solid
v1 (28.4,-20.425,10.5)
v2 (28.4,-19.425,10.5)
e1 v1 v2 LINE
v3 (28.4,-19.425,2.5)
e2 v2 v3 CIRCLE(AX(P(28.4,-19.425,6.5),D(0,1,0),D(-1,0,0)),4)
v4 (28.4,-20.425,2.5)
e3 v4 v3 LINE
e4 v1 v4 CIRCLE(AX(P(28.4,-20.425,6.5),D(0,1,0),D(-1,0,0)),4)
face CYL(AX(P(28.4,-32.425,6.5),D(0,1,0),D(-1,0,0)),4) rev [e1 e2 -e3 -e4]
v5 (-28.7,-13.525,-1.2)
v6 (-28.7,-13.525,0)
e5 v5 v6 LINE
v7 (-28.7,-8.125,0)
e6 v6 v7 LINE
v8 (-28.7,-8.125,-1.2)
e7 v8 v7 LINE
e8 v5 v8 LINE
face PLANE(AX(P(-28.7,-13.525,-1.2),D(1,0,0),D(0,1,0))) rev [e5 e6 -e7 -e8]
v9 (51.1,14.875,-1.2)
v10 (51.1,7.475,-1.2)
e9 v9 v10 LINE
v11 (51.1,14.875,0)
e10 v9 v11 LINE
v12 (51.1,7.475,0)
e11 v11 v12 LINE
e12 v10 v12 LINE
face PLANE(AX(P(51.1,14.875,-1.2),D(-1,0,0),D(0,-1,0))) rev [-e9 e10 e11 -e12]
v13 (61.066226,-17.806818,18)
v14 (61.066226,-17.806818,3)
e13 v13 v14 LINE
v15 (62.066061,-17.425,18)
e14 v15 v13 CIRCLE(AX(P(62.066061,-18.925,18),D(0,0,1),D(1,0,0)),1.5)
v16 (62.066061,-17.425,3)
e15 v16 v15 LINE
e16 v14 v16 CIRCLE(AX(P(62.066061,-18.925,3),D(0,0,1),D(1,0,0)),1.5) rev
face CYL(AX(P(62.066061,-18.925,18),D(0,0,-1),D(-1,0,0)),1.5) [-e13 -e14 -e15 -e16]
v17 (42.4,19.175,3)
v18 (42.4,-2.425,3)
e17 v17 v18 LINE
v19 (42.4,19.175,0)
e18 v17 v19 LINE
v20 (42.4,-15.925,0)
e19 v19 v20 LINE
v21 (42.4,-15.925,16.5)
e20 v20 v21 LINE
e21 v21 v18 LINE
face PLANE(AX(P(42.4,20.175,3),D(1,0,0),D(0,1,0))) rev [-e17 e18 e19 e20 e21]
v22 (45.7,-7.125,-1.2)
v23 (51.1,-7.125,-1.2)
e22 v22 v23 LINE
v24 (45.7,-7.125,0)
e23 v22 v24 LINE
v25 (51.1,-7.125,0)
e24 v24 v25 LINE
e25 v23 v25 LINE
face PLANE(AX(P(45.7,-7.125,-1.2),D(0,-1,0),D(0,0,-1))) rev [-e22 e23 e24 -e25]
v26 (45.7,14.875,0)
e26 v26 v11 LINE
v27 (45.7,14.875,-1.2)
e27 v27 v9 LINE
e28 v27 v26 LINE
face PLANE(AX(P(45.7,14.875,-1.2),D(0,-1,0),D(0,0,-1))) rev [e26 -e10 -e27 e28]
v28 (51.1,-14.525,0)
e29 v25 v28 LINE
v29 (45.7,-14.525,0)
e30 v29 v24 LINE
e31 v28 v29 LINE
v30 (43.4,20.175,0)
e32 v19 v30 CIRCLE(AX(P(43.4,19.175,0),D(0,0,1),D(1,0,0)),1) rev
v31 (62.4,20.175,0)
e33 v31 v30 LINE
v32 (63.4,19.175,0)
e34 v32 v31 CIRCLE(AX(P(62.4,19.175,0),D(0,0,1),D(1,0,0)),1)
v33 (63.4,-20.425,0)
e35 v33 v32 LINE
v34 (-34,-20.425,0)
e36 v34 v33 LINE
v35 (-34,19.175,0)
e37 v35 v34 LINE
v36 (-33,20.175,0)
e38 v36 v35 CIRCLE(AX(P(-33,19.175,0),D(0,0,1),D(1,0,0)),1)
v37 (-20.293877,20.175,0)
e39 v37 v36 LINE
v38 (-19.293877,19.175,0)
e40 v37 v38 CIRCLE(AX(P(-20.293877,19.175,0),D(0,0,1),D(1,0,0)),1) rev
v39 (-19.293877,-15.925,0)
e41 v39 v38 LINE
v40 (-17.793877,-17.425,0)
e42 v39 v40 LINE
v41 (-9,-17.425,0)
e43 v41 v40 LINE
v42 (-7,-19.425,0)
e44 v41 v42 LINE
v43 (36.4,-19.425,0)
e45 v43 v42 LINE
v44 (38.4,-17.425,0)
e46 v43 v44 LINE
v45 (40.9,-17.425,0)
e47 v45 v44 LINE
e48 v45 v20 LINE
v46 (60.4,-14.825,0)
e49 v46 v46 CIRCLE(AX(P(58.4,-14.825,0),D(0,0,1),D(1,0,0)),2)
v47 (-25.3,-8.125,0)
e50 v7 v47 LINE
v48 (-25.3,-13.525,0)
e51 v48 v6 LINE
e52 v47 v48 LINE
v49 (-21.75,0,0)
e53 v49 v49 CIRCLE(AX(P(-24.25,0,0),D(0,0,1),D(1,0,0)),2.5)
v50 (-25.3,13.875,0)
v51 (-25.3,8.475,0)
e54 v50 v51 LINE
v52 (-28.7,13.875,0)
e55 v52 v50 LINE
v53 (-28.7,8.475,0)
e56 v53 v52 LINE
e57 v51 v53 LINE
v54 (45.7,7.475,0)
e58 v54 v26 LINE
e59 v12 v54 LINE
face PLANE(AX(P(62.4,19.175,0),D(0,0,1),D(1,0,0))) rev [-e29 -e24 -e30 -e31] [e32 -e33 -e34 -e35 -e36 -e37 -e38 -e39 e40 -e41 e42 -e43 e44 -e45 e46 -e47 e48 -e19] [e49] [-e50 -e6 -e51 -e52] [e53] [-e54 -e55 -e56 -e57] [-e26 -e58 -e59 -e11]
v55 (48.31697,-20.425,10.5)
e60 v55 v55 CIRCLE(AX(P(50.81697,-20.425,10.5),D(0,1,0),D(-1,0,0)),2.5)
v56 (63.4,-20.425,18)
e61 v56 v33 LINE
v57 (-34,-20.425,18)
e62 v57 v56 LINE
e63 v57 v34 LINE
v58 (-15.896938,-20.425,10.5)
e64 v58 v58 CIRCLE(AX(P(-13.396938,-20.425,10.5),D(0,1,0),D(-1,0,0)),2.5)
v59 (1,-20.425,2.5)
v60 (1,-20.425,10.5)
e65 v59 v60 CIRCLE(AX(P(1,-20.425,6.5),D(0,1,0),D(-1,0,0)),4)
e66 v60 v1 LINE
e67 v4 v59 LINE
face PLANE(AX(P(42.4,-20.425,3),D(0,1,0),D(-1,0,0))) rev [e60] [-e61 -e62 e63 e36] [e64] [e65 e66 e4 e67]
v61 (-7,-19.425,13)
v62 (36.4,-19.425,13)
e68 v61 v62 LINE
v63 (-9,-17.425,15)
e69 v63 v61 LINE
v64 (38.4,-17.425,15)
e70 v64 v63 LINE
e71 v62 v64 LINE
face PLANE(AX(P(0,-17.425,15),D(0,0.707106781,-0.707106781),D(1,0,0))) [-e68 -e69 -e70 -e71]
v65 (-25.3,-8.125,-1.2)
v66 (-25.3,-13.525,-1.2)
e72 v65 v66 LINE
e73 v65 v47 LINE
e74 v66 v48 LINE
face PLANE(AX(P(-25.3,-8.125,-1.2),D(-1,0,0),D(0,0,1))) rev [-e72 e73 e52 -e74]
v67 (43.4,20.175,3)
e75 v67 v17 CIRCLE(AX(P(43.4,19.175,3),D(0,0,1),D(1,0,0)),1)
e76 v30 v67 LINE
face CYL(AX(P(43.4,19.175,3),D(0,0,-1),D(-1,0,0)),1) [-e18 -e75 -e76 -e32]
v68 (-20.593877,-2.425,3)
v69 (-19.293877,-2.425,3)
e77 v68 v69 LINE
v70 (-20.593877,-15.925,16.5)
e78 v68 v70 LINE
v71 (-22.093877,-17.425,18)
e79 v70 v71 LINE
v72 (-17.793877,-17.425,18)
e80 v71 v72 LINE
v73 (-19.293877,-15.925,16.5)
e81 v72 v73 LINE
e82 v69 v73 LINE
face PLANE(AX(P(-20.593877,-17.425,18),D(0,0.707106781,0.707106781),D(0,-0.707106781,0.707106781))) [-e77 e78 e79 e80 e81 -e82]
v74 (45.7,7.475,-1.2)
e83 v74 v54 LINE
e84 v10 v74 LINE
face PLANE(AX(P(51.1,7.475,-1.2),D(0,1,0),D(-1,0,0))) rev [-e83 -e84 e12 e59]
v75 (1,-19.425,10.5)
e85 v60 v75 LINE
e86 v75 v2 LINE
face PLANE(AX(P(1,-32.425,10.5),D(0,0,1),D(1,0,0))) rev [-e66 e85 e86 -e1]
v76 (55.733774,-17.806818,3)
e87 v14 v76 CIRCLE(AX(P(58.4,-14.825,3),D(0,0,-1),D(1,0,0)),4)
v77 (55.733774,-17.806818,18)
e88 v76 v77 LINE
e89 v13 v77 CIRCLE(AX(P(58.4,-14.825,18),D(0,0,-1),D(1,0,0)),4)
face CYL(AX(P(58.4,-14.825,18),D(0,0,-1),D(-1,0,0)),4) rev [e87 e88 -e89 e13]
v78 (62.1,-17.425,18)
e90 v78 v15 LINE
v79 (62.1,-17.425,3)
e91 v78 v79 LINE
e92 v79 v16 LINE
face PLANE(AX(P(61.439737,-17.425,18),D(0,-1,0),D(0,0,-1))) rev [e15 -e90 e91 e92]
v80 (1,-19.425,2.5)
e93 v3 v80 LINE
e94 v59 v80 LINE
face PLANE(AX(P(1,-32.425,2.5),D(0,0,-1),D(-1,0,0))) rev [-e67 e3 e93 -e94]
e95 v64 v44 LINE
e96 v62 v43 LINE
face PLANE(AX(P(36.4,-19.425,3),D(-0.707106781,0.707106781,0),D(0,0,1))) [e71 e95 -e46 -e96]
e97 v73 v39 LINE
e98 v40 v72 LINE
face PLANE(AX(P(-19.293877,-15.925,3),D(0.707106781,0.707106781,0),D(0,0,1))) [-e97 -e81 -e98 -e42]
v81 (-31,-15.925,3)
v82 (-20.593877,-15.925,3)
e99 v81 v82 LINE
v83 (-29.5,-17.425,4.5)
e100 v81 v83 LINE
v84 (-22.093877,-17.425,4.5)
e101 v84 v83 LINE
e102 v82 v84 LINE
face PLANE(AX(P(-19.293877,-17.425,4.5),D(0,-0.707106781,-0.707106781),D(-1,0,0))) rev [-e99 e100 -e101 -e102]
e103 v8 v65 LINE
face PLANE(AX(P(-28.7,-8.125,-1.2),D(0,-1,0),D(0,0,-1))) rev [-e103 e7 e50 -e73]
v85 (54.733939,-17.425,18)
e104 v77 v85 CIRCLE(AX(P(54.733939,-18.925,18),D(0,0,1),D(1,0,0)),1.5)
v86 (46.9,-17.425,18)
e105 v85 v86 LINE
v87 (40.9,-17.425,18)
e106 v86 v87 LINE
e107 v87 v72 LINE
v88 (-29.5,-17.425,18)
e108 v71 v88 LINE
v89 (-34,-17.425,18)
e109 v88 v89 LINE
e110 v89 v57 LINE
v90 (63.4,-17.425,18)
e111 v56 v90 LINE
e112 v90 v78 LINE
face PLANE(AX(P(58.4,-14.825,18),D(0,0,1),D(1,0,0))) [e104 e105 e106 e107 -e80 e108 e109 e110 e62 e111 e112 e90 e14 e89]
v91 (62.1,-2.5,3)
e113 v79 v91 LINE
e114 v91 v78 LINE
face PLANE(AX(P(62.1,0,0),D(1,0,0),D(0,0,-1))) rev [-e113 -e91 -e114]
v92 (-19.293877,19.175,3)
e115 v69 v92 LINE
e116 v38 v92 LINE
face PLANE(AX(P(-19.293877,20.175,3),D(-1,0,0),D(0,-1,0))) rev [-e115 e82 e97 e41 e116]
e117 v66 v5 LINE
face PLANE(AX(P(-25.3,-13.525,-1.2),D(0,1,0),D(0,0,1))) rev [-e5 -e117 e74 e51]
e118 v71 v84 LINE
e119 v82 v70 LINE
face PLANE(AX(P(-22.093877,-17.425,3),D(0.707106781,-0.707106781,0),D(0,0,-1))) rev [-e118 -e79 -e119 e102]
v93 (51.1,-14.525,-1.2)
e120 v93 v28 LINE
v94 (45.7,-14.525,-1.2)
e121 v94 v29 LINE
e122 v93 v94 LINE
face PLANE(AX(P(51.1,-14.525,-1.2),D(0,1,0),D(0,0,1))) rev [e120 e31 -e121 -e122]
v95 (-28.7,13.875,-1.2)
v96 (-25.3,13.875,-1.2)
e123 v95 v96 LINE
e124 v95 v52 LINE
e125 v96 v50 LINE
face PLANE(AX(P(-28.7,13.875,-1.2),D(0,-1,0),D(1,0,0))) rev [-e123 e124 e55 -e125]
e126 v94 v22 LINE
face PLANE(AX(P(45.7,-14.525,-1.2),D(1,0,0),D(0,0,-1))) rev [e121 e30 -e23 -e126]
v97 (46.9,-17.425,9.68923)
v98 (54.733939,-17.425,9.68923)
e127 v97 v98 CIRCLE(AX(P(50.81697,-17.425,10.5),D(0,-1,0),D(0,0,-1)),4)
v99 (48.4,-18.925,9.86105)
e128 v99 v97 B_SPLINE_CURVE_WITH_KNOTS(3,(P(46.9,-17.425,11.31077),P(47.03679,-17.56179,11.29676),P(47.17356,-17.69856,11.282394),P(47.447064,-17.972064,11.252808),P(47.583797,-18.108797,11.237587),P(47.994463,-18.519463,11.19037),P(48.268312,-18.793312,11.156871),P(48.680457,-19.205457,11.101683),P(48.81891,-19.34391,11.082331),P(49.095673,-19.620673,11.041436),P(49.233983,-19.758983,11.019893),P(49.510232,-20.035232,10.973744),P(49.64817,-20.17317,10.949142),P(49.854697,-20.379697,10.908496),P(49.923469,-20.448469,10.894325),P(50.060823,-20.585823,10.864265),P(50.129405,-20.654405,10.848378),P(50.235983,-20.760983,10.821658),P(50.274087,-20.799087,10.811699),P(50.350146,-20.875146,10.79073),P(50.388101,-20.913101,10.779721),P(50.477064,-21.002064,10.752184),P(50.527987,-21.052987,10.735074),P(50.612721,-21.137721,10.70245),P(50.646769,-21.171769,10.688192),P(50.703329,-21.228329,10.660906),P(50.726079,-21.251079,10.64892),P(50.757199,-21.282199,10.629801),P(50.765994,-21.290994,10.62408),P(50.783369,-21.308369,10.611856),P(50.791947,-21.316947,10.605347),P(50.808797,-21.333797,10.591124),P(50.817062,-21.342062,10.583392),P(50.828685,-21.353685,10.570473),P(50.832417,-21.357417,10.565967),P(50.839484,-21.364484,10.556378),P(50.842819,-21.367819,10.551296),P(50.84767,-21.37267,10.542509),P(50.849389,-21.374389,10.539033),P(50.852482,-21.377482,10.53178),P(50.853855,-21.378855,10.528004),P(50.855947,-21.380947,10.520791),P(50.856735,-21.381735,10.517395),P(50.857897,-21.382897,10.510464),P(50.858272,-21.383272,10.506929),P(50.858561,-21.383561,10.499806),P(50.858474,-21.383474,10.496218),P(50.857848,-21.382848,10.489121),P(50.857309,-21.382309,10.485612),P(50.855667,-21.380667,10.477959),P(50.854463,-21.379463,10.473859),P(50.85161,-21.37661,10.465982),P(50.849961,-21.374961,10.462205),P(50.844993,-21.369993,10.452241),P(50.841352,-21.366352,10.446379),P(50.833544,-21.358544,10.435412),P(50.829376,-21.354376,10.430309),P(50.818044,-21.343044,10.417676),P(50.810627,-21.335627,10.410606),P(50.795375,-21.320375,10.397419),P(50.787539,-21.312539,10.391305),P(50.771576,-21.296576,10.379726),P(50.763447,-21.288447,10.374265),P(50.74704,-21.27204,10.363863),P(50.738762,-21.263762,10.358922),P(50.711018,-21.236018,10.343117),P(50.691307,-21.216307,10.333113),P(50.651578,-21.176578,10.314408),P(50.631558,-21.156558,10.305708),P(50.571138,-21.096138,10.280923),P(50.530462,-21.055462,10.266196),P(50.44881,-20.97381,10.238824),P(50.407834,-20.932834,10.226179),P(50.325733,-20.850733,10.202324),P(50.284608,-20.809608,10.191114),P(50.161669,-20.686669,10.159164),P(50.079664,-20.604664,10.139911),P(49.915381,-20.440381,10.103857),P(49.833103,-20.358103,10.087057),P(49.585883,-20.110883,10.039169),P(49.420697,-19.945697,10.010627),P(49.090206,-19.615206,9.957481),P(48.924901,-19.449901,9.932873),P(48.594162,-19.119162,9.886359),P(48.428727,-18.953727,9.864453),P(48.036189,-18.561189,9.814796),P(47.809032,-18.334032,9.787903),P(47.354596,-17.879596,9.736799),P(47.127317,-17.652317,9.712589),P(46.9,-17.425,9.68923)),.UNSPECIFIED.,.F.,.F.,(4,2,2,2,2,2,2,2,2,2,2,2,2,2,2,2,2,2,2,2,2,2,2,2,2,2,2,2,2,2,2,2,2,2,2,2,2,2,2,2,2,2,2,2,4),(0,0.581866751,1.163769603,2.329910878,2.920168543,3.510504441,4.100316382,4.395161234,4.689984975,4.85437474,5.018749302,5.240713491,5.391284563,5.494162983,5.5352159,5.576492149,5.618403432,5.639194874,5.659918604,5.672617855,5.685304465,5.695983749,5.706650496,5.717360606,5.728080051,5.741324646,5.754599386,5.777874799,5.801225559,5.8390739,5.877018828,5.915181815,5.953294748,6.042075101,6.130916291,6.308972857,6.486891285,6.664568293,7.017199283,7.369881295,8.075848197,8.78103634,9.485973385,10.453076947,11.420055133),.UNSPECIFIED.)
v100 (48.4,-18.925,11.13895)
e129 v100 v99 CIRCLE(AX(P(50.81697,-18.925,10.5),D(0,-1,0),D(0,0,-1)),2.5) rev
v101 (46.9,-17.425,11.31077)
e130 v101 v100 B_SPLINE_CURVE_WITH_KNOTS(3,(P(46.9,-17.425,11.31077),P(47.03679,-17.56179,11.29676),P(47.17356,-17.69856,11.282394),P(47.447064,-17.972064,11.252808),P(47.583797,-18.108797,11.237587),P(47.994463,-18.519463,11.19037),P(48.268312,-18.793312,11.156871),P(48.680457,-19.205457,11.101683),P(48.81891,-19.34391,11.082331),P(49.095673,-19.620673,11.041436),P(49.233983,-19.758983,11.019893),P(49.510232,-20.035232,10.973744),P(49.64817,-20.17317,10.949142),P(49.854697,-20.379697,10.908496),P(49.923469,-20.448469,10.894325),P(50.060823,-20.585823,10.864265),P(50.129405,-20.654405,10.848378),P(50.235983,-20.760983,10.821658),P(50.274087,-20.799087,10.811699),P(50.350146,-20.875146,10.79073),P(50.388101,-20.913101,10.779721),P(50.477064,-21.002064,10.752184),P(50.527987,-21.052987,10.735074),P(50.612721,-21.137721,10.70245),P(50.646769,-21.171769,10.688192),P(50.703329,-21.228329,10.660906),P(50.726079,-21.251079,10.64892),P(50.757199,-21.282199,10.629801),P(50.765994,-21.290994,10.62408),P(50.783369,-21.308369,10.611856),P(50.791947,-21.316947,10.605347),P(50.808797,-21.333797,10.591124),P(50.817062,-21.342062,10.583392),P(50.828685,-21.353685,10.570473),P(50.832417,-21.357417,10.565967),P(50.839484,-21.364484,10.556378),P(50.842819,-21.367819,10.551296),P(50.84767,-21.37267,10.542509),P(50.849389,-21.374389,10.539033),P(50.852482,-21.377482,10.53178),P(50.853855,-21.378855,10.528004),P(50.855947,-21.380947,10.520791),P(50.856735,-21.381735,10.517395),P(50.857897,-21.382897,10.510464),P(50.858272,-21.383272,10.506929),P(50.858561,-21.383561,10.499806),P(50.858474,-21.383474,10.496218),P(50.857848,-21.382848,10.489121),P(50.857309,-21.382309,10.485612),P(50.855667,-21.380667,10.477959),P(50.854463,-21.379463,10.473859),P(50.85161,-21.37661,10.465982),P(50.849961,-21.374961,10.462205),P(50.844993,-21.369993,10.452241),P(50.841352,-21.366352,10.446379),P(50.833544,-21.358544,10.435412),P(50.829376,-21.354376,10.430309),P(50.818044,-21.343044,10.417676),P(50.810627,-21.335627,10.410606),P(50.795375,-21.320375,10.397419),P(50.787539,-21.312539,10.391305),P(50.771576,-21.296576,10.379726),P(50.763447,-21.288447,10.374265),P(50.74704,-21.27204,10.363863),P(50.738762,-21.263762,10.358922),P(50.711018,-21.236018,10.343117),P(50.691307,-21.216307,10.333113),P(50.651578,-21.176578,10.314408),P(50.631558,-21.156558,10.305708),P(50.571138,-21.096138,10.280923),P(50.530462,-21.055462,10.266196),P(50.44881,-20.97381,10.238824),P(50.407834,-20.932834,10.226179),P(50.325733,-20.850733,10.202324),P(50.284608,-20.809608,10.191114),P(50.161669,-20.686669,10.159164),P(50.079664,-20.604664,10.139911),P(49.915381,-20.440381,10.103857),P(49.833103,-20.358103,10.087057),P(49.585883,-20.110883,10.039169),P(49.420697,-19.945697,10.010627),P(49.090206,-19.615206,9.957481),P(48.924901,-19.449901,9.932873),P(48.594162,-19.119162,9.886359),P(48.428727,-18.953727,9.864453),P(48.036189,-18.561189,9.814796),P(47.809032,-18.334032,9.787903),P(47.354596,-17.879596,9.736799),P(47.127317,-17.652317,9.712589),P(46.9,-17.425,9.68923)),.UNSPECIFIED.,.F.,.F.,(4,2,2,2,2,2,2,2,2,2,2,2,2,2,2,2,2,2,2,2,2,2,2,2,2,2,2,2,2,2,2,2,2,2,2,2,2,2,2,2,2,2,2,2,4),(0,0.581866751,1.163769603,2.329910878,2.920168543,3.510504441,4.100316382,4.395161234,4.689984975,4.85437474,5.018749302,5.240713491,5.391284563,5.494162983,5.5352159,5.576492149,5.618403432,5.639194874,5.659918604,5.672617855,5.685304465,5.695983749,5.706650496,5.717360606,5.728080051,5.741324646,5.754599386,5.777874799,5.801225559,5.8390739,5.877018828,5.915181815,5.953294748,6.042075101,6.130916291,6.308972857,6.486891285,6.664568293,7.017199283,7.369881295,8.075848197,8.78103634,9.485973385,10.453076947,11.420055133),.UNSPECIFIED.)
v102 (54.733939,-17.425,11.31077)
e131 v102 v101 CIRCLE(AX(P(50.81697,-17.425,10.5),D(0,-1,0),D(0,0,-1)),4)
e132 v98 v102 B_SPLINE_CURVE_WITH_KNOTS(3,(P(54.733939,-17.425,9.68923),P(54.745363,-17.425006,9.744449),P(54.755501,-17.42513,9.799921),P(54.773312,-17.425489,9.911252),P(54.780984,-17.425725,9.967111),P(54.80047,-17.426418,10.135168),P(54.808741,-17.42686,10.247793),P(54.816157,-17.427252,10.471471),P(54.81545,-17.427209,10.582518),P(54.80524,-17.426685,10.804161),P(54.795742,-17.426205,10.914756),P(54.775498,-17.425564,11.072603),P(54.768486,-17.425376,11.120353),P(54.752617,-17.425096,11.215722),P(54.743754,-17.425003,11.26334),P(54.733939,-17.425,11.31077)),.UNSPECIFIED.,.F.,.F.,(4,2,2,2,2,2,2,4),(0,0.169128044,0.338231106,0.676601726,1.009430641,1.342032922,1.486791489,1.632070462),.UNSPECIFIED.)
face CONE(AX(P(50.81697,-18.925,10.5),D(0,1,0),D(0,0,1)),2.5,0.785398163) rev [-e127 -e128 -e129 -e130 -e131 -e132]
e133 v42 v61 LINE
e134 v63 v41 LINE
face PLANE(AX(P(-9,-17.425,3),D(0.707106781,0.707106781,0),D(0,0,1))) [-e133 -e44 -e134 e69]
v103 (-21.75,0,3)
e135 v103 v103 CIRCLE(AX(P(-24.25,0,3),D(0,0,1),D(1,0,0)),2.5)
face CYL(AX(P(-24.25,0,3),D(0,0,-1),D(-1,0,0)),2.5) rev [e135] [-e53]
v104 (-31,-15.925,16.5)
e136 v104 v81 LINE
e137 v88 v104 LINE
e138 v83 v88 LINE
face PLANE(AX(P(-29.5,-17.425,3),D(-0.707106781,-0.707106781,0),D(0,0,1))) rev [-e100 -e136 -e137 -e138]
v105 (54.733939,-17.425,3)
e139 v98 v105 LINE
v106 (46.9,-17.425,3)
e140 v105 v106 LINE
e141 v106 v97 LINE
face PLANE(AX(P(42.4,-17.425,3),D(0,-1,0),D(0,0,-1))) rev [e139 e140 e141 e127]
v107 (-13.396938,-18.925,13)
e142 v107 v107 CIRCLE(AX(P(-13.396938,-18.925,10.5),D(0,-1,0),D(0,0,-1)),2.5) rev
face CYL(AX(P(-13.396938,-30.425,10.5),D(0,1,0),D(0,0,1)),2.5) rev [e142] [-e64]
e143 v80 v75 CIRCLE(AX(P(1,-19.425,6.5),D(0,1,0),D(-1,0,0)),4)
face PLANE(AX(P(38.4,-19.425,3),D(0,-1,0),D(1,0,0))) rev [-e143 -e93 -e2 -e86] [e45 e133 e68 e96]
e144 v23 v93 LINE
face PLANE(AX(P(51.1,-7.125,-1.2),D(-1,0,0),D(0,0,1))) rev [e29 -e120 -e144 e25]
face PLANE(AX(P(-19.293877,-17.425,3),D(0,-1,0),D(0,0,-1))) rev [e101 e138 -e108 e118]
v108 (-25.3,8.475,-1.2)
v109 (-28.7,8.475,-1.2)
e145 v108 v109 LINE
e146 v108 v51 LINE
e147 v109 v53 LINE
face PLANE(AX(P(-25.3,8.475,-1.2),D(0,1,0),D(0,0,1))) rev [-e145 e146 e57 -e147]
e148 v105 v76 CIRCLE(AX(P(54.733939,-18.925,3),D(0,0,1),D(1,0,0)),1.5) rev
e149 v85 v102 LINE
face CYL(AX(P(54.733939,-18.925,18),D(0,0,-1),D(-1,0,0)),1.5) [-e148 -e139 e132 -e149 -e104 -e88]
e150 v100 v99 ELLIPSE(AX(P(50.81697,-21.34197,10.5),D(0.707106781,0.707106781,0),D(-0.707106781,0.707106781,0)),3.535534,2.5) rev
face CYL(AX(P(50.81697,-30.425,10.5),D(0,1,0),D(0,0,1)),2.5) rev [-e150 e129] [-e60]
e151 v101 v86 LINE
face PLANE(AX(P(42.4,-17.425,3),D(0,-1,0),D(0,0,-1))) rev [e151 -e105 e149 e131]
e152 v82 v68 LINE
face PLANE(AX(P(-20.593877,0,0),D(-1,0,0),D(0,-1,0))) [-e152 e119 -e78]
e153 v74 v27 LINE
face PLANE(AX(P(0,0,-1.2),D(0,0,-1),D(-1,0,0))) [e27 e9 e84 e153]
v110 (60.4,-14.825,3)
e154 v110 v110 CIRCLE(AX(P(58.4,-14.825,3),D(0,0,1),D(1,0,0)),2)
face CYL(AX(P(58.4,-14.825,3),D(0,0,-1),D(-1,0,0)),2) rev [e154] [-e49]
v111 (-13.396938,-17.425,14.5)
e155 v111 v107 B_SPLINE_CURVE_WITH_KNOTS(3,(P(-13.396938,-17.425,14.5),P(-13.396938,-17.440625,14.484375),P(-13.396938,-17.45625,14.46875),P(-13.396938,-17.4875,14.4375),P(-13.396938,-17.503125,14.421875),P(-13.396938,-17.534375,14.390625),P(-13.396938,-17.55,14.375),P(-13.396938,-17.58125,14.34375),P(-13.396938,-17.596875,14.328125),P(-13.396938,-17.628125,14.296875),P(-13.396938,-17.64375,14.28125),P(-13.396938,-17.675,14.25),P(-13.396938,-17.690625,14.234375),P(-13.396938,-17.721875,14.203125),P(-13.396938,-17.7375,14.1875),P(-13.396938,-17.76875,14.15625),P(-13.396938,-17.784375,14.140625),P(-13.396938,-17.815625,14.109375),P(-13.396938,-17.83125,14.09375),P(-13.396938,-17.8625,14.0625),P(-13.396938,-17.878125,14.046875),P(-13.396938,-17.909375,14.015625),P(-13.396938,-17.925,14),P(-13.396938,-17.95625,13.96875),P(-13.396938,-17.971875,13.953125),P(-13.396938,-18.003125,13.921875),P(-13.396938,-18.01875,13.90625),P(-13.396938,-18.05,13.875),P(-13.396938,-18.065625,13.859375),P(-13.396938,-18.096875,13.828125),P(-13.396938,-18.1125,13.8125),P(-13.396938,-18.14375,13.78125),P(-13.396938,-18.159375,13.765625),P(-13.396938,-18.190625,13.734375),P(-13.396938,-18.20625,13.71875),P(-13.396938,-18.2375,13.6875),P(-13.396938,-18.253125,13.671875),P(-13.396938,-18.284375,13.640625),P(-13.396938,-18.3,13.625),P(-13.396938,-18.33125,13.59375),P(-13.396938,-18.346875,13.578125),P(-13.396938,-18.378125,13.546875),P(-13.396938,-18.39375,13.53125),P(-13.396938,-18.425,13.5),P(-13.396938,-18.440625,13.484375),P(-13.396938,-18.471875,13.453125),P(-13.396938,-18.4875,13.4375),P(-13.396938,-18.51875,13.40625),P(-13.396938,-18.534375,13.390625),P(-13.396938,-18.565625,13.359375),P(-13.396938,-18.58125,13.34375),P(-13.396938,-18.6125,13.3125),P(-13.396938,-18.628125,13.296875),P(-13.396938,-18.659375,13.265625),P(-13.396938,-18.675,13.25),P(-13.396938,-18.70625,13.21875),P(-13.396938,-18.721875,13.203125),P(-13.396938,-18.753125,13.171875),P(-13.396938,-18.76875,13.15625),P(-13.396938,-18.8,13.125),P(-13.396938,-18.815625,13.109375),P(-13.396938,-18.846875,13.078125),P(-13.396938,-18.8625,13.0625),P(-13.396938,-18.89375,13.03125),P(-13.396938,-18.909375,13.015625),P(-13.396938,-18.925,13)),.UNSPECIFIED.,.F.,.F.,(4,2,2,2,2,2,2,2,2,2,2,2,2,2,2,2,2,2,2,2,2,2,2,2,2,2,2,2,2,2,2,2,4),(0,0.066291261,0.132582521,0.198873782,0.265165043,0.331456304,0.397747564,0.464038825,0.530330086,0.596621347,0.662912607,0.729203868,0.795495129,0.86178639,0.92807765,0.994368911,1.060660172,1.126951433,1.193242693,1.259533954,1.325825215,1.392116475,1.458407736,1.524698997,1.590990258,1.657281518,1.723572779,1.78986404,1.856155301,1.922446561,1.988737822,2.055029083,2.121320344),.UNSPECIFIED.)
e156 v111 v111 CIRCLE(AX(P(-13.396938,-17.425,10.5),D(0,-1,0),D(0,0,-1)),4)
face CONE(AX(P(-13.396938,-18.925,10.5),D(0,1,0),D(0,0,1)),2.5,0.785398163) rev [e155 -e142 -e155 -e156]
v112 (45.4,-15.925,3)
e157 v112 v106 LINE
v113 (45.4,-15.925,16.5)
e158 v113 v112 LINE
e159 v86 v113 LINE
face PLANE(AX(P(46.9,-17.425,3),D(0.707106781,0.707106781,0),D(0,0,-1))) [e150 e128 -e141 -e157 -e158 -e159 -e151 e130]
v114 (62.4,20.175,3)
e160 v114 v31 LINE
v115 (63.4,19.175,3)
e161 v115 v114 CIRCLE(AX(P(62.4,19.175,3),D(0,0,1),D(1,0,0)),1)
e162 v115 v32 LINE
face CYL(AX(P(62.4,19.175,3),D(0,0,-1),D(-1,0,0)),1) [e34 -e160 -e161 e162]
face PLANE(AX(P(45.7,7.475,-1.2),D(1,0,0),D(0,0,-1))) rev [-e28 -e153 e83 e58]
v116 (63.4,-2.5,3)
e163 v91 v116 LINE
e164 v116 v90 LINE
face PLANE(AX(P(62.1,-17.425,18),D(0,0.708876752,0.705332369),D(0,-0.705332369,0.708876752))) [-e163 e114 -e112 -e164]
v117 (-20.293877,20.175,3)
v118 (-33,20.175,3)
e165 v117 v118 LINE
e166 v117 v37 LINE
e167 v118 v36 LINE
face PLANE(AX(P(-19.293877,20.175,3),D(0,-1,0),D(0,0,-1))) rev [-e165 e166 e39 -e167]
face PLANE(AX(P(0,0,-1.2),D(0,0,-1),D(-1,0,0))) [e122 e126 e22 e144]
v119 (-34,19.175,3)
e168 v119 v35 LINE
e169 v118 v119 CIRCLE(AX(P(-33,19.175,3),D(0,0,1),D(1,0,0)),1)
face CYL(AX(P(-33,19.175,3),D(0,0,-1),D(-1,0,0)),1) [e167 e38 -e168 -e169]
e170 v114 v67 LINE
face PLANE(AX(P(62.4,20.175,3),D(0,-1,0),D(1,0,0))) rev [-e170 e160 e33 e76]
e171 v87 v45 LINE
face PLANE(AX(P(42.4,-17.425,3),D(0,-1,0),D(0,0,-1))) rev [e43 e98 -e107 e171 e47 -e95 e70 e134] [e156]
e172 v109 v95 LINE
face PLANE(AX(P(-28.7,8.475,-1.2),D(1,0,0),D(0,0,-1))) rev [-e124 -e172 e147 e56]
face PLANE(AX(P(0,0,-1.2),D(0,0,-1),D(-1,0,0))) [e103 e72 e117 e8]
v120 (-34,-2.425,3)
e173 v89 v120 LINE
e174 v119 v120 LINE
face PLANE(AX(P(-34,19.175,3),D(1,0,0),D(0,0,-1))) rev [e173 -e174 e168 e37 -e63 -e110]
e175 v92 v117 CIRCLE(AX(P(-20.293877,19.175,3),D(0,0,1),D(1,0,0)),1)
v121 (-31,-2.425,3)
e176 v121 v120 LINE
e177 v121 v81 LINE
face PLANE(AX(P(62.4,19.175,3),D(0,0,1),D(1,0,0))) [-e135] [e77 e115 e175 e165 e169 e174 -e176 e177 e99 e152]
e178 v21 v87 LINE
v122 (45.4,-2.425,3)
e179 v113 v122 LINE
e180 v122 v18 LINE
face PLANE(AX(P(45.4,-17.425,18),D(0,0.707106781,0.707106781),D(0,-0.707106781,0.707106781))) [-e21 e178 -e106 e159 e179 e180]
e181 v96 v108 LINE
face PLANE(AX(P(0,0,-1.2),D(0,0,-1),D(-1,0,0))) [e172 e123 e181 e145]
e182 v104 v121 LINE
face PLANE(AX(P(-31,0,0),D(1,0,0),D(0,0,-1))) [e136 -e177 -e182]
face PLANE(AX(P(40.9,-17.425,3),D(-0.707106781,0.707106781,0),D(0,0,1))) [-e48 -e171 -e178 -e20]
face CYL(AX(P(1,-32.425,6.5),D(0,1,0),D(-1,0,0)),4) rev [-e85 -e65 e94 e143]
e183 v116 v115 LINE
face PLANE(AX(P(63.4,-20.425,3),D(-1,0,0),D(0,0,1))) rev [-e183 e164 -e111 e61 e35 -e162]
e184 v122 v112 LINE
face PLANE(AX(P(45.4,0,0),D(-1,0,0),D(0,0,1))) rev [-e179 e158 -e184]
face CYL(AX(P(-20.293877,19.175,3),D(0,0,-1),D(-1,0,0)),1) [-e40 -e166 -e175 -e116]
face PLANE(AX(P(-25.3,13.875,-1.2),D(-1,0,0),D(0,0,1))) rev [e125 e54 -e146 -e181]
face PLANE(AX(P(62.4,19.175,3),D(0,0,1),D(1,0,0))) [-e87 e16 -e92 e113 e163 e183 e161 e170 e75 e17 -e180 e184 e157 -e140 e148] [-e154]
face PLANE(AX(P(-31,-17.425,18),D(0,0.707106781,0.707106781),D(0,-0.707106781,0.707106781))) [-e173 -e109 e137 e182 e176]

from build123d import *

# Parameters (mm, degrees)
ESBO_O2_R                = 2.5
ESBO_O2_R_2              = 2
RESSALTO_EXTRUS_O1_DEPTH = 3
ESBO_O3_W                = 5.4
ESBO_O3_H                = 7.4
ESBO_O3_W_2              = 3.4
ESBO_O3_H_2              = 5.4
RESSALTO_EXTRUS_O2_DEPTH = 1.2
RESSALTO_EXTRUS_O3_DEPTH = 15
CHANFRO1_SIZE            = 2
FILETE1_R                = 1.5
FILETE2_R                = 1
RESSALTO_EXTRUS_O4_DEPTH = 3
RESSALTO_EXTRUS_O5_DEPTH = 1.3
RESSALTO_EXTRUS_O6_DEPTH = 1.3
RESSALTO_EXTRUS_O7_DEPTH = 3
CHANFRO2_SIZE            = 1.5
ESBO_O10_R               = 2.5
CORTE_EXTRUS_O1_DEPTH    = 13
CHANFRO3_SIZE            = 1.5
CORTE_EXTRUS_O2_DEPTH    = 13
ESBO_O12_W               = 47.4
ESBO_O12_H               = 3
RESSALTO_EXTRUS_O8_DEPTH = 3
CHANFRO4_SIZE            = 2


# Some blends are built 0.0001 mm under size
with BuildPart() as part:
    # Esboço2 → Ressalto-extrusão1 (new body)
    with BuildSketch(Plane.XY):
        with BuildLine():
            Line((-19.293876913, 20.175), (-19.293876913, -17.425))
            Line((-19.293876913, -17.425), (-9, -17.425))
            Line((-9, -17.425), (-9, -19.425))
            Line((-9, -19.425), (38.4, -19.425))
            Line((38.4, -19.425), (38.4, -17.425))
            Line((38.4, -17.425), (42.4, -17.425))
            Line((42.4, -17.425), (42.4, 20.175))
            Line((42.4, 20.175), (62.4, 20.175))
            ThreePointArc((62.4, 20.175), (63.107106781, 19.882106781), (63.4, 19.175))
            Line((63.4, 19.175), (63.4, -20.425))
            Line((63.4, -20.425), (42.4, -20.425))
            Line((42.4, -20.425), (-19.293876913, -20.425))
            Line((-19.293876913, -20.425), (-34, -20.425))
            Line((-34, -20.425), (-34, 19.175))
            ThreePointArc((-34, 19.175), (-33.707106781, 19.882106781), (-33, 20.175))
            Line((-33, 20.175), (-19.293876913, 20.175))
        make_face()
        with Locations((-24.25, 0)):
            Circle(ESBO_O2_R, mode=Mode.SUBTRACT)
        with Locations((58.4, -14.825)):
            Circle(ESBO_O2_R_2, mode=Mode.SUBTRACT)
    extrude(amount=RESSALTO_EXTRUS_O1_DEPTH)

    # Esboço3 → Ressalto-extrusão2 (add)
    with BuildSketch(Plane(origin=(0, 0, 0), x_dir=(-1, 0, 0), z_dir=(0, 0, -1))):
        with Locations((-48.4, 11.175)):
            Rectangle(ESBO_O3_W, ESBO_O3_H)
        with Locations((-48.4, -10.825)):
            Rectangle(ESBO_O3_W, ESBO_O3_H)
        with Locations((27, 11.175)):
            Rectangle(ESBO_O3_W_2, ESBO_O3_H_2)
        with Locations((27, -10.825)):
            Rectangle(ESBO_O3_W_2, ESBO_O3_H_2)
    extrude(amount=RESSALTO_EXTRUS_O2_DEPTH)

    # Esboço4 → Ressalto-extrusão3 (add)
    with BuildSketch(Plane.XY.offset(3)):
        with BuildLine():
            Line((-34, -20.425), (63.4, -20.425))
            Line((63.4, -20.425), (63.4, -17.425))
            Line((63.4, -17.425), (61.439736831, -17.425))
            ThreePointArc((61.439736831, -17.425), (58.4, -18.825), (55.360263169, -17.425))
            Line((55.360263169, -17.425), (38.4, -17.425))
            Line((38.4, -17.425), (38.4, -19.425))
            Line((38.4, -19.425), (-9, -19.425))
            Line((-9, -19.425), (-9, -17.425))
            Line((-9, -17.425), (-34, -17.425))
            Line((-34, -17.425), (-34, -20.425))
        make_face()
    extrude(amount=RESSALTO_EXTRUS_O3_DEPTH)

    # Chanfro1
    chanfro1_edges = [part.edges().sort_by_distance(p)[0] for p in [
        (38.4, -19.425, 9),
        (-9, -19.425, 9),
    ]]
    chamfer(chanfro1_edges, length=CHANFRO1_SIZE - 0.0001)  # a hair under: the kernel refuses the full size

    # Filete1
    filete1_edges = [part.edges().sort_by_distance(p)[0] for p in [
        (61.439736831, -17.425, 10.5),
        (55.360263169, -17.425, 10.5),
    ]]
    fillet(filete1_edges, radius=FILETE1_R)

    # Filete2
    filete2_edges = [part.edges().sort_by_distance(p)[0] for p in [
        (-19.293876913, 20.175, 1.5),
        (42.4, 20.175, 1.5),
    ]]
    fillet(filete2_edges, radius=FILETE2_R)

    # Esboço6 → Ressalto-extrusão4 (add)
    with BuildSketch(Plane.ZY.offset(34)):
        Polygon((18, -17.425), (3, -2.425), (3, -17.425), align=None)
    extrude(amount=-RESSALTO_EXTRUS_O4_DEPTH)

    # Esboço7 → Ressalto-extrusão5 (add)
    with BuildSketch(Plane(origin=(63.4, 0, 0), x_dir=(0, 0, -1), z_dir=(1, 0, 0))):
        Polygon((-18, -17.425), (-3, -2.5), (-3, -17.425), align=None)
    extrude(amount=-RESSALTO_EXTRUS_O5_DEPTH)

    # Esboço8 → Ressalto-extrusão6 (add)
    with BuildSketch(Plane(origin=(-19.293876913, 0, 0), x_dir=(0, 0, -1), z_dir=(1, 0, 0))):
        Polygon((-3, -2.425), (-3, -17.425), (-18, -17.425), align=None)
    extrude(amount=-RESSALTO_EXTRUS_O6_DEPTH)

    # Esboço9 → Ressalto-extrusão7 (add)
    with BuildSketch(Plane.ZY.offset(-42.4)):
        Polygon((3, -2.425), (3, -17.425), (18, -17.425), align=None)
    extrude(amount=-RESSALTO_EXTRUS_O7_DEPTH)

    # Chanfro2
    chanfro2_edges = [part.edges().sort_by_distance(p)[0] for p in [
        (-31, -17.425, 10.5),
        (-25.796938457, -17.425, 3),
        (-20.593876913, -17.425, 10.5),
        (45.4, -17.425, 10.5),
        (-19.293876913, -17.425, 9),
        (42.4, -17.425, 9),
    ]]
    chamfer(chanfro2_edges, length=CHANFRO2_SIZE)

    # Esboço10 → Corte-extrusão1 (cut)
    with BuildSketch(Plane(origin=(0, -17.425, 0), x_dir=(1, 0, 0), z_dir=(0, 1, 0))):
        with Locations(Location((-13.396938457, -10.5, 0), (0, 0, 270))):
            Circle(ESBO_O10_R)
        with Locations(Location((50.816969722, -10.5, 0), (0, 0, 270))):
            Circle(ESBO_O10_R)
    extrude(amount=-CORTE_EXTRUS_O1_DEPTH, mode=Mode.SUBTRACT)

    # Chanfro3
    # the kernel refuses this chamfer: 1.5 mm, written as the material it takes off along each edge
    with BuildSketch(Plane(origin=(-13.396938457, -17.425, 10.5), x_dir=(0, 0, 1), z_dir=(-1, 0, 0))) as chanfro3_piece_1:
        Polygon((2.5 + CHANFRO3_SIZE, 0), (2.5, -CHANFRO3_SIZE), (2.5, 0), align=None)
    revolve(axis=Axis((-13.396938457, -17.425, 10.5), (0, 1, 0)), mode=Mode.SUBTRACT)
    with BuildSketch(Plane(origin=(50.816969722, -17.425, 10.5), x_dir=(0, 0, 1), z_dir=(-1, 0, 0))) as chanfro3_piece_2_section:
        Polygon((2.5 + CHANFRO3_SIZE, 0), (2.5, -CHANFRO3_SIZE), (2.5, 0), align=None)
    chanfro3_piece_2 = revolve(axis=Axis((50.816969722, -17.425, 10.5), (0, 1, 0)), mode=Mode.PRIVATE)
    chanfro3_piece_2 = split(chanfro3_piece_2, bisect_by=Plane(origin=(50.475171982, -21.000171982, 8.459359331), z_dir=(0.7071067811865476, 0.7071067811865476, 0)), keep=Keep.TOP, mode=Mode.PRIVATE)
    add(chanfro3_piece_2, mode=Mode.SUBTRACT)

    # Esboço11 → Corte-extrusão2 (cut)
    with BuildSketch(Plane(origin=(0, -19.425, 0), x_dir=(1, 0, 0), z_dir=(0, 1, 0))):
        with BuildLine():
            Line((1, -2.5), (28.4, -2.5))
            ThreePointArc((28.4, -2.5), (32.4, -6.5), (28.4, -10.5))
            Line((28.4, -10.5), (1, -10.5))
            ThreePointArc((1, -10.5), (-3, -6.5), (1, -2.5))
        make_face()
    extrude(amount=-CORTE_EXTRUS_O2_DEPTH, mode=Mode.SUBTRACT)

    # Esboço12 → Ressalto-extrusão8 (add)
    with BuildSketch(Plane.XY.offset(18)):
        with Locations((14.7, -18.925)):
            Rectangle(ESBO_O12_W, ESBO_O12_H)
    extrude(amount=-RESSALTO_EXTRUS_O8_DEPTH)

    # Chanfro4
    chanfro4_edges = [part.edges().sort_by_distance(p)[0] for p in [
        (14.7, -19.425, 15),
    ]]
    chamfer(chanfro4_edges, length=CHANFRO4_SIZE - 0.0001)  # a hair under: the kernel refuses the full size


solid = part.part
